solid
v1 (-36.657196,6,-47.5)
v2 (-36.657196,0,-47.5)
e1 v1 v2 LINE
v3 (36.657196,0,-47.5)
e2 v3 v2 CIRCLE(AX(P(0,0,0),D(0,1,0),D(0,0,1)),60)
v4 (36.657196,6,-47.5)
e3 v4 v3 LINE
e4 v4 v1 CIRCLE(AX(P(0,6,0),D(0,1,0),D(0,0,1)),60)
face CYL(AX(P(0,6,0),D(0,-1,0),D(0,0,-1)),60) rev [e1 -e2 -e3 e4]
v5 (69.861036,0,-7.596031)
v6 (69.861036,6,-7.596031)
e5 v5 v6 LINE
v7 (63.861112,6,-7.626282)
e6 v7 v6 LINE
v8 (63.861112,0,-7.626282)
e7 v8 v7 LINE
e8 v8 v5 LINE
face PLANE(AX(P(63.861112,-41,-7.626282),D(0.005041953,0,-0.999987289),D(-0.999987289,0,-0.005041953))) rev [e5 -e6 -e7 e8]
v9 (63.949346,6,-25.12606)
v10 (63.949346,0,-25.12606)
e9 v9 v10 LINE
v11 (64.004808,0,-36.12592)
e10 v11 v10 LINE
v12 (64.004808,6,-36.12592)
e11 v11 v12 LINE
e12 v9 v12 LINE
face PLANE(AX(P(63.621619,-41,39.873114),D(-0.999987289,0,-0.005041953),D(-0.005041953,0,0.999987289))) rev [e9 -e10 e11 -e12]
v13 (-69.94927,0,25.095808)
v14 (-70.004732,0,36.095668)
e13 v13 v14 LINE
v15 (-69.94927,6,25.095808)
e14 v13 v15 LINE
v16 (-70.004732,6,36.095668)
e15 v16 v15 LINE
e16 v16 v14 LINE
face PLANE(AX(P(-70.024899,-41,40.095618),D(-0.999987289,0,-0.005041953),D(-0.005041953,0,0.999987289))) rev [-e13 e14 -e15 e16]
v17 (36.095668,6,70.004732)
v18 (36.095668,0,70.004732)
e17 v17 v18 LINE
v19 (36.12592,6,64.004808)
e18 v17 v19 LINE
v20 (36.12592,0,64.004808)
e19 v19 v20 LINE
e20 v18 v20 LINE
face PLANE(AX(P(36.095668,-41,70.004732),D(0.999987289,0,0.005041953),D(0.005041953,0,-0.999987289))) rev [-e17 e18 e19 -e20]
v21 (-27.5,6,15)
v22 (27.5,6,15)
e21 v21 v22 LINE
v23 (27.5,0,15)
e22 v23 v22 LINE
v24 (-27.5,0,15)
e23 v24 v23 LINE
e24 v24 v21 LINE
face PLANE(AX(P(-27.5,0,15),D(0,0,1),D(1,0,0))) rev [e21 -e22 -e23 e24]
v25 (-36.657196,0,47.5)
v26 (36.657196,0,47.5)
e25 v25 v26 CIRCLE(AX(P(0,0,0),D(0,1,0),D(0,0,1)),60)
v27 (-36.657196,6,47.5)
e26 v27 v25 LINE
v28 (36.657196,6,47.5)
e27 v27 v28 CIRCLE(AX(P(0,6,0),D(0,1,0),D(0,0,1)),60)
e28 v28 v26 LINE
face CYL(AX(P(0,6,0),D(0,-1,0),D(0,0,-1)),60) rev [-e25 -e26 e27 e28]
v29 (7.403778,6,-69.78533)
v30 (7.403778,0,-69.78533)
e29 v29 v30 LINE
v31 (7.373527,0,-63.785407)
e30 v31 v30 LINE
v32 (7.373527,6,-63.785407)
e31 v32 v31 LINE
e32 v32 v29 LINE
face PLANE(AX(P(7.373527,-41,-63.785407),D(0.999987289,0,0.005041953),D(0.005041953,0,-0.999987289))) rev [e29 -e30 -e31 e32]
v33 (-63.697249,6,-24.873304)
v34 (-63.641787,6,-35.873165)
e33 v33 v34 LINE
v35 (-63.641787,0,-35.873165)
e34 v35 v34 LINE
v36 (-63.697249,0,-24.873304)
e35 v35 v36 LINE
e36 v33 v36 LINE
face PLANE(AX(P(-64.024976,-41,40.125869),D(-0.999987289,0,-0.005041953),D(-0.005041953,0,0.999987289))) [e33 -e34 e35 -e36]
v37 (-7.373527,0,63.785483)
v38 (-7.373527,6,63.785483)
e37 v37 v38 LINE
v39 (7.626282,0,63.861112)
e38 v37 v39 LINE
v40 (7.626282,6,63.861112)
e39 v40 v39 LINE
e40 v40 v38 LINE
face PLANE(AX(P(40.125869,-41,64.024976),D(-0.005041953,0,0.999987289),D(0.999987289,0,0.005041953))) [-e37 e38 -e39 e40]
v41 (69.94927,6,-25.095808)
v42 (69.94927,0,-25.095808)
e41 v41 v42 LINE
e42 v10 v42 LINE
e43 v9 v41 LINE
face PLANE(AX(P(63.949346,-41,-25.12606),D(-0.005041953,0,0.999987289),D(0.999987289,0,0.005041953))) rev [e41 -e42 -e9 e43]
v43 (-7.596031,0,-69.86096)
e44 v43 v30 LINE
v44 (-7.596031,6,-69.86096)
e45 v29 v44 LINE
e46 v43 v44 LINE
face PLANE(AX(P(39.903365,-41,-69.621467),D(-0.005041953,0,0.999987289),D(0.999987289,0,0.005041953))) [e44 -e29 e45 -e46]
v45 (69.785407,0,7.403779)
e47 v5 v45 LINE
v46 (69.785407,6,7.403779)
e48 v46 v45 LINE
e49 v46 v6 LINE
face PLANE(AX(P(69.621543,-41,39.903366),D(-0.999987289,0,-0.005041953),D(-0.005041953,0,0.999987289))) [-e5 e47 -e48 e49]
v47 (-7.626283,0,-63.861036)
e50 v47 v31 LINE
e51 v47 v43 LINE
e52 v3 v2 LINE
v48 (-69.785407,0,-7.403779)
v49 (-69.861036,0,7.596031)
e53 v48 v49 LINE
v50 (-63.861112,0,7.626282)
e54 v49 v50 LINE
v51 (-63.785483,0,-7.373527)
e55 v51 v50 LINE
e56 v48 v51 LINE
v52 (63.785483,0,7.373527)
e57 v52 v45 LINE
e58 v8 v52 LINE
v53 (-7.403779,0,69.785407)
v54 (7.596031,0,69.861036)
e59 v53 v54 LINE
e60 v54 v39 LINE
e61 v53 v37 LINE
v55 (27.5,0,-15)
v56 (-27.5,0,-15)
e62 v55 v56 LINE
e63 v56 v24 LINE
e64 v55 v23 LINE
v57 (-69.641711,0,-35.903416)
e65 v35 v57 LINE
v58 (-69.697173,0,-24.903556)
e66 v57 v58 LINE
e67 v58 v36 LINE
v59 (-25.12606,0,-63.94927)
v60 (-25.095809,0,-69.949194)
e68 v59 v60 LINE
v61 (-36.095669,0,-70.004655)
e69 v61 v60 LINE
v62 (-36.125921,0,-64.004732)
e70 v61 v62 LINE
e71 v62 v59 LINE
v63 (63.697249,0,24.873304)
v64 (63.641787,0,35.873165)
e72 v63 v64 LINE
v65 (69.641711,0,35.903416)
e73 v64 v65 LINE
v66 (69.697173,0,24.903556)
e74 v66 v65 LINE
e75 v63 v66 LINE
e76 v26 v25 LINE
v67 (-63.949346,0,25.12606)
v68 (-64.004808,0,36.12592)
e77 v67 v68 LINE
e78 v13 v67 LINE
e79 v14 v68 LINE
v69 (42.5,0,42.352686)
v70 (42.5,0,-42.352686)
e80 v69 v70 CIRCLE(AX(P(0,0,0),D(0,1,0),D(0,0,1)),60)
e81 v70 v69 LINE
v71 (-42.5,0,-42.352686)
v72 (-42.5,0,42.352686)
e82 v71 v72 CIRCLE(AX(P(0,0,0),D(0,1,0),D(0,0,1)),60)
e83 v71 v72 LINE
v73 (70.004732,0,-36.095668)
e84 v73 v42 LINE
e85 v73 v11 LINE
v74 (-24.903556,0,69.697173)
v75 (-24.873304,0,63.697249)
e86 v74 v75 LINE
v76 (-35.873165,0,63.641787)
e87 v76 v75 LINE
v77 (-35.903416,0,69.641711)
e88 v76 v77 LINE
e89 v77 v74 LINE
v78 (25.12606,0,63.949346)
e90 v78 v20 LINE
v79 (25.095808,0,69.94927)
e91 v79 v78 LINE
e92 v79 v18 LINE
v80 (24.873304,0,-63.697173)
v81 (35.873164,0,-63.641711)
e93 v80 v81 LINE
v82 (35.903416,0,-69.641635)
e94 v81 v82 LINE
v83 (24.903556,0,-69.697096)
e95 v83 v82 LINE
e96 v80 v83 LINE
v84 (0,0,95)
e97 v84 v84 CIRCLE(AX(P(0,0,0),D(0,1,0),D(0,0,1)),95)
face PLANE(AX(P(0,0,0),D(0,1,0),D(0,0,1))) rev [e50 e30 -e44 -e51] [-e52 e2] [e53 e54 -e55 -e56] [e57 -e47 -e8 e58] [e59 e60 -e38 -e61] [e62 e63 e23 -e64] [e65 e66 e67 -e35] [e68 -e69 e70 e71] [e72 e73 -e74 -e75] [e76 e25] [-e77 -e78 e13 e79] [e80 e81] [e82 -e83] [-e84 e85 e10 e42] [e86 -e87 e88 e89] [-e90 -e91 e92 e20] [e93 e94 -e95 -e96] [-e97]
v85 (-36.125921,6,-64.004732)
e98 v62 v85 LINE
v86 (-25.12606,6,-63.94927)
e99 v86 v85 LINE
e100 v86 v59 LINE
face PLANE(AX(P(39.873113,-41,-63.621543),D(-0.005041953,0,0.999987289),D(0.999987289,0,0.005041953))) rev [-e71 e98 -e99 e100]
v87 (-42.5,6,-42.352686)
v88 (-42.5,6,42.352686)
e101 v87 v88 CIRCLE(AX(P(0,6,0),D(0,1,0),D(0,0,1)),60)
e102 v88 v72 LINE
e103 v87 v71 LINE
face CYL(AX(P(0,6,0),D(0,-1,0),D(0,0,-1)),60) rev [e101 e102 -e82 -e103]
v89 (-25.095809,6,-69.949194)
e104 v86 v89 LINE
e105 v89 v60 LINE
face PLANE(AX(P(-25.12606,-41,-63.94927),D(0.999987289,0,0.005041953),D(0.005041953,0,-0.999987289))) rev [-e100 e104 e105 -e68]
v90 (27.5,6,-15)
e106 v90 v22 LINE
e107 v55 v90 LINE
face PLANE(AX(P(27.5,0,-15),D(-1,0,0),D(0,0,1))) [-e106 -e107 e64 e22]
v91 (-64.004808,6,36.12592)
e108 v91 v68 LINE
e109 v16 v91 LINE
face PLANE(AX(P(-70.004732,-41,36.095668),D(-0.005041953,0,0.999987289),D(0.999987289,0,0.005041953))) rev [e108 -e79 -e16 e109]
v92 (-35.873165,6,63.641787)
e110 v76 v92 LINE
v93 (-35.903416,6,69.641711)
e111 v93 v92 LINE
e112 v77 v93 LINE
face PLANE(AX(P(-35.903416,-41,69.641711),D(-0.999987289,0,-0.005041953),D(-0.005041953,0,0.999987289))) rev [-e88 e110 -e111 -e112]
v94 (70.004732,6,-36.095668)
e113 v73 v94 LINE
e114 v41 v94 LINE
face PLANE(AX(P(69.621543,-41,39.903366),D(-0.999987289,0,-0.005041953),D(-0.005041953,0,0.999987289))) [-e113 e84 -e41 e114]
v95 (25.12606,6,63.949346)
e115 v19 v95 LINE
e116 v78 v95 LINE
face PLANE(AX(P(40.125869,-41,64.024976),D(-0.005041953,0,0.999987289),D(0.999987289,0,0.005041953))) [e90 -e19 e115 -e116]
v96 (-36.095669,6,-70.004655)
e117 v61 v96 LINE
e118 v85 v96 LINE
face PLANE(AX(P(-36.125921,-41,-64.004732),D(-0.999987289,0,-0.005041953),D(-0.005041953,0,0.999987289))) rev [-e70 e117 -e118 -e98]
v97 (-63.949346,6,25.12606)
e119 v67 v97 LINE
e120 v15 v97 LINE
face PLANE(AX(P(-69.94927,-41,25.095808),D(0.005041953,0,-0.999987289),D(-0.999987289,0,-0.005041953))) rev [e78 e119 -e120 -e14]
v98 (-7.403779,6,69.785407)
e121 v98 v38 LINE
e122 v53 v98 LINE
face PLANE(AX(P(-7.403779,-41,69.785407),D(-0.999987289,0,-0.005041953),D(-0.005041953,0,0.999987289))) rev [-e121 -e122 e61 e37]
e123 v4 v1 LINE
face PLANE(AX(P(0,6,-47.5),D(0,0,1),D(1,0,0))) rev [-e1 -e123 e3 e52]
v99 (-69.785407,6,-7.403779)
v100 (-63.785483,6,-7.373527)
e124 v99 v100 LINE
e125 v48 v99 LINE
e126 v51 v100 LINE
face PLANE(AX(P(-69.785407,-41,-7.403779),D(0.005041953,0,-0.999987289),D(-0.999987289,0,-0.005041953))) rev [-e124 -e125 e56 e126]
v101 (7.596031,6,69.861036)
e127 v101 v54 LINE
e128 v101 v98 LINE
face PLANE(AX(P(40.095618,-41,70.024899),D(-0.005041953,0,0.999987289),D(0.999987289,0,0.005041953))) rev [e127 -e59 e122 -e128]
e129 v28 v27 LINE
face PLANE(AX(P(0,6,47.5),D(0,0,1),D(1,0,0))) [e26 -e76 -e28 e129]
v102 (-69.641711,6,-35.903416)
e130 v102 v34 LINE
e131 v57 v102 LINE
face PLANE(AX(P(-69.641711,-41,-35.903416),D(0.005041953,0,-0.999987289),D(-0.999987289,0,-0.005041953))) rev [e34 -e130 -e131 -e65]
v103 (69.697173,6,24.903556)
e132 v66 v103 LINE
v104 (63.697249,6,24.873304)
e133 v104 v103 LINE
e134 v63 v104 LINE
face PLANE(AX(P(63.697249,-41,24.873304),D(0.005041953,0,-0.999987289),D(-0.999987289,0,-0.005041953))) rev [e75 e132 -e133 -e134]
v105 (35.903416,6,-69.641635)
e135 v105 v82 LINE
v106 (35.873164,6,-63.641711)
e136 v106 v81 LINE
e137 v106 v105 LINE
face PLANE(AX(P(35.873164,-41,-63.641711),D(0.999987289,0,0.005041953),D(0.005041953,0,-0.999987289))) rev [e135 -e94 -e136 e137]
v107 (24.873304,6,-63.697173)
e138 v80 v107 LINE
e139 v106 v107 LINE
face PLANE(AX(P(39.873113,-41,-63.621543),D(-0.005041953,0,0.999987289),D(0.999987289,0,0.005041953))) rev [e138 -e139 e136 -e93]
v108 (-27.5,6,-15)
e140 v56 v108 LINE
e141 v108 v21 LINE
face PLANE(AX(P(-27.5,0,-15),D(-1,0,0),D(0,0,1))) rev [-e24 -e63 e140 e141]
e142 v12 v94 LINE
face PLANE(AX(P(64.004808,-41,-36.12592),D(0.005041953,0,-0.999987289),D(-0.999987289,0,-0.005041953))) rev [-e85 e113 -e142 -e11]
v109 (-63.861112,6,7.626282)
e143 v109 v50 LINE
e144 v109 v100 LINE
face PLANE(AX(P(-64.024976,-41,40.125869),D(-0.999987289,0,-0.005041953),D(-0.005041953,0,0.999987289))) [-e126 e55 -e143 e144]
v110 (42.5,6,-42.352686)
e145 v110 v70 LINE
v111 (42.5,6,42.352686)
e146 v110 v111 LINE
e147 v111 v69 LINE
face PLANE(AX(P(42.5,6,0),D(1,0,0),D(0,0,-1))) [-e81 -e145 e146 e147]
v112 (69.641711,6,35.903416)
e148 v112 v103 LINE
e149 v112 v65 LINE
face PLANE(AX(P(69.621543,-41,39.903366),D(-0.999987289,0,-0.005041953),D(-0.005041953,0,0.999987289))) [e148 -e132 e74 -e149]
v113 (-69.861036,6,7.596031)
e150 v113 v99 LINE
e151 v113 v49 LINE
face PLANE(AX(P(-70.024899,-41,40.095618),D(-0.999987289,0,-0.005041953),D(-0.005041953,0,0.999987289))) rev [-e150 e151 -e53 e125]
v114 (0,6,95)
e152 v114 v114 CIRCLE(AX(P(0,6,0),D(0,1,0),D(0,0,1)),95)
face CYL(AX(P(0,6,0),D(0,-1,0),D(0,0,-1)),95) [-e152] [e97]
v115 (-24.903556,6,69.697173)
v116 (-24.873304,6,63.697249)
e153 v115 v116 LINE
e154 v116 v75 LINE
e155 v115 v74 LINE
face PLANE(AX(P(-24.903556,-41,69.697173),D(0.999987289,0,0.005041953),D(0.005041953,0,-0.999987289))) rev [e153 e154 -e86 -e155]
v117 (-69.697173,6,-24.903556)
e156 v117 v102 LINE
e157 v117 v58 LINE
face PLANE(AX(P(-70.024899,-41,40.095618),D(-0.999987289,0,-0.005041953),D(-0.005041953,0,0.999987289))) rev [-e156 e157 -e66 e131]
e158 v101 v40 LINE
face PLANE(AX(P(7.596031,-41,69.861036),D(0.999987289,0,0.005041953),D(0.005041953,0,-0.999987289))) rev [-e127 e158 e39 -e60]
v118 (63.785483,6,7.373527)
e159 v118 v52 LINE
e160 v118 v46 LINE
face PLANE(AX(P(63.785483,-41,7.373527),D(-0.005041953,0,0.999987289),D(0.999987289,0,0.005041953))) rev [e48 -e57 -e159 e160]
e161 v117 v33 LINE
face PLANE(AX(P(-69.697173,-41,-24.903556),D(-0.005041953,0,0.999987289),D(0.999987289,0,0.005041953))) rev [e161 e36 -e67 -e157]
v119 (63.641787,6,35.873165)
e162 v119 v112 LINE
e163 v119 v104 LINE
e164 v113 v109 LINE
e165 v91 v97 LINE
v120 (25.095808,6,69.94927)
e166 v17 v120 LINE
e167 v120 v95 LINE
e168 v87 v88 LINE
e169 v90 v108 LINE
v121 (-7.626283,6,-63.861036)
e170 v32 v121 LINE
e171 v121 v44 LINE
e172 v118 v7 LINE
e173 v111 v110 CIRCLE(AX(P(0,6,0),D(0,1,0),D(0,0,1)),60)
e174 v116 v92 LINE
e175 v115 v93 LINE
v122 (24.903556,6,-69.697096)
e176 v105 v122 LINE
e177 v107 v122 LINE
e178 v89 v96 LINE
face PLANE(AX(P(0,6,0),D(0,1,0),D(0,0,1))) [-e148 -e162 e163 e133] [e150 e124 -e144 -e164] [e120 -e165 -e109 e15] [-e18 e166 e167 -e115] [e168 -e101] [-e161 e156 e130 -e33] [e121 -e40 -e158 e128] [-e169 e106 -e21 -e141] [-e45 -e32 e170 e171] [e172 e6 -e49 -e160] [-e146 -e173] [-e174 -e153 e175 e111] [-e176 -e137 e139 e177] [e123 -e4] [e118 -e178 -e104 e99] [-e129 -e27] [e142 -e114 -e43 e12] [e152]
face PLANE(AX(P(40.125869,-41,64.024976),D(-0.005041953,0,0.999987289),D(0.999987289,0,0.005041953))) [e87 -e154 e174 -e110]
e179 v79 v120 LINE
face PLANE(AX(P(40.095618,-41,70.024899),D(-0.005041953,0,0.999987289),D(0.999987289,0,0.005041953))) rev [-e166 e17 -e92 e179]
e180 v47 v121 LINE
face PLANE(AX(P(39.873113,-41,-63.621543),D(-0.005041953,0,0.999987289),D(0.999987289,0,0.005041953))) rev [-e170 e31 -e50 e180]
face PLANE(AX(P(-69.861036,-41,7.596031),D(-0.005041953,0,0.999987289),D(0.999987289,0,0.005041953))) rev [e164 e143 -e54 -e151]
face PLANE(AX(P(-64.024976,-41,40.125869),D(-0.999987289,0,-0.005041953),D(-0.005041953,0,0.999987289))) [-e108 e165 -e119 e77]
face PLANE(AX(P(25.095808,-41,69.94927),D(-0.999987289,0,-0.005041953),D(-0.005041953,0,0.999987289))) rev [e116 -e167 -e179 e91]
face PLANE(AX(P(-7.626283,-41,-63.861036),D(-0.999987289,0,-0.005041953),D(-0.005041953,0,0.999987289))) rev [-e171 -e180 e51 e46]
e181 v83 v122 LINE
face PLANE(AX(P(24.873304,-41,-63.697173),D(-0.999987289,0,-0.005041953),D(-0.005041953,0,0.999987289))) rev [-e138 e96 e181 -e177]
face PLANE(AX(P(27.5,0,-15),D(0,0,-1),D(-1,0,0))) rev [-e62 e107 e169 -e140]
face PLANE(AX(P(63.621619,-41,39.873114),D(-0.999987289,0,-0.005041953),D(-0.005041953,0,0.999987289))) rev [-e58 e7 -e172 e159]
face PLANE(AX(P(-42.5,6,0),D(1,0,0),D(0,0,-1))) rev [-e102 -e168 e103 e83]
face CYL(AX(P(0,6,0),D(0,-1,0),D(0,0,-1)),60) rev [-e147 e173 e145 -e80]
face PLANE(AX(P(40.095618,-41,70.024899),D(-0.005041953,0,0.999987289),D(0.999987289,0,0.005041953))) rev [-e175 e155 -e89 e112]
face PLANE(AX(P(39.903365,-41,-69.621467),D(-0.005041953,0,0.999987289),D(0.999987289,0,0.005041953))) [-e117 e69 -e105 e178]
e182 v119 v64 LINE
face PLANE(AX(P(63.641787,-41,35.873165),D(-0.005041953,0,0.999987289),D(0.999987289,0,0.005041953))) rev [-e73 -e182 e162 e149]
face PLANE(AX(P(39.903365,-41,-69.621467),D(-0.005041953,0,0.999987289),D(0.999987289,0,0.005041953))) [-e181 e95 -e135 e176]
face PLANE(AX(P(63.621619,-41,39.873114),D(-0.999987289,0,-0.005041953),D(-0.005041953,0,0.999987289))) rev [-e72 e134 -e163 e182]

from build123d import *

# Parameters (mm, degrees)
SKETCH1_R             = 95
BOSS_EXTRUDE1_DEPTH   = 6
SKETCH2_W             = 55
SKETCH2_H             = 30
CUT_EXTRUDE1_DEPTH    = 135.484199815
CAVITY1_START         = -69.821849164
CAVITY1_OUTLINE_W     = 15
CAVITY1_OUTLINE_H     = 6
CAVITY1_OUTLINE_W_2   = 11
CAVITY1_DEPTH         = 6
CAVITY1_START_2       = 63.821772898
CAVITY1_2_OUTLINE_W   = 11
CAVITY1_2_OUTLINE_H   = 6
CAVITY1_2_OUTLINE_W_2 = 15
CAVITY1_2_DEPTH       = 6
CAVITY1_START_3       = -7.051829773
CAVITY1_3_OUTLINE_W   = 6
CAVITY1_3_OUTLINE_H   = 6
CAVITY1_3_DEPTH       = 14.103659546
CAVITY1_START_4       = -35.551829773
CAVITY1_4_OUTLINE_W   = 6
CAVITY1_4_OUTLINE_H   = 6
CAVITY1_4_DEPTH       = 10.103659546
CAVITY1_START_5       = 25.448170227
CAVITY1_5_OUTLINE_W   = 6
CAVITY1_5_OUTLINE_H   = 6
CAVITY1_5_DEPTH       = 10.103659546
CAVITY1_START_6       = -36.448170227
CAVITY1_6_OUTLINE_W   = 6
CAVITY1_6_OUTLINE_H   = 6
CAVITY1_6_DEPTH       = 0.896340454
CAVITY1_START_7       = -25.448170227
CAVITY1_7_OUTLINE_W   = 6
CAVITY1_7_OUTLINE_H   = 6
CAVITY1_7_DEPTH       = 0.896340454
CAVITY1_START_8       = -7.948170227
CAVITY1_8_OUTLINE_W   = 6
CAVITY1_8_OUTLINE_H   = 6
CAVITY1_8_DEPTH       = 0.896340454
CAVITY1_START_9       = 7.051829773
CAVITY1_9_OUTLINE_W   = 6
CAVITY1_9_OUTLINE_H   = 6
CAVITY1_9_DEPTH       = 0.896340454
CAVITY1_START_10      = 24.551829773
CAVITY1_10_OUTLINE_W  = 6
CAVITY1_10_OUTLINE_H  = 6
CAVITY1_10_DEPTH      = 0.896340454
CAVITY1_START_11      = 35.551829773
CAVITY1_11_OUTLINE_W  = 6
CAVITY1_11_OUTLINE_H  = 6
CAVITY1_11_DEPTH      = 0.896340454


# Read off the part's stored shape, not the designer's step: Cavity1
with BuildPart() as part:
    # Sketch1 → Boss-Extrude1 (new body)
    with BuildSketch(Plane(origin=(0, 0, 0), x_dir=(1, 0, 0), z_dir=(0, 1, 0))):
        with Locations(Location((0, 0, 0), (0, 0, 270))):
            Circle(SKETCH1_R)
        with BuildLine():
            Line((-36.657195747, -47.5), (36.657195747, -47.5))
            ThreePointArc((36.657195747, -47.5), (0, -60), (-36.657195747, -47.5))
        make_face(mode=Mode.SUBTRACT)
        with BuildLine():
            Line((-42.5, 42.352685865), (-42.5, -42.352685865))
            ThreePointArc((-42.5, -42.352685865), (-60, 0), (-42.5, 42.352685865))
        make_face(mode=Mode.SUBTRACT)
        with BuildLine():
            Line((36.657195747, 47.5), (-36.657195747, 47.5))
            ThreePointArc((-36.657195747, 47.5), (0, 60), (36.657195747, 47.5))
        make_face(mode=Mode.SUBTRACT)
        with BuildLine():
            Line((42.5, -42.352685865), (42.5, 42.352685865))
            ThreePointArc((42.5, 42.352685865), (60, 0), (42.5, -42.352685865))
        make_face(mode=Mode.SUBTRACT)
    extrude(amount=BOSS_EXTRUDE1_DEPTH)

    # Sketch2 → Cut-Extrude1 (cut, through all)
    with BuildSketch(Plane(origin=(0, 6, 0), x_dir=(1, 0, 0), z_dir=(0, 1, 0))):
        Rectangle(SKETCH2_W, SKETCH2_H)
    extrude(amount=-CUT_EXTRUDE1_DEPTH, mode=Mode.SUBTRACT)

    # Cavity1 outline → Cavity1 (cut)
    with BuildSketch(Plane(origin=(0, 0, 0), x_dir=(0.9999872892756082, 0, 0.005041952719030872), z_dir=(0.005041952719030872, 0, -0.9999872892756083)).offset(CAVITY1_START)):
        with Locations((0.448170227, -3)):
            Rectangle(CAVITY1_OUTLINE_W, CAVITY1_OUTLINE_H)
        with Locations((30.948170227, -3)):
            Rectangle(CAVITY1_OUTLINE_W_2, CAVITY1_OUTLINE_H)
        with Locations((-30.051829773, -3)):
            Rectangle(CAVITY1_OUTLINE_W_2, CAVITY1_OUTLINE_H)
    extrude(amount=CAVITY1_DEPTH, mode=Mode.SUBTRACT)

    # Cavity1 2 outline → Cavity1 2 (cut)
    with BuildSketch(Plane(origin=(0, 0, 0), x_dir=(0.9999872892756082, 0, 0.005041952719030872), z_dir=(0.005041952719030872, 0, -0.9999872892756083)).offset(CAVITY1_START_2)):
        with Locations((30.051829773, -3)):
            Rectangle(CAVITY1_2_OUTLINE_W, CAVITY1_2_OUTLINE_H)
        with Locations((-0.448170227, -3)):
            Rectangle(CAVITY1_2_OUTLINE_W_2, CAVITY1_2_OUTLINE_H)
        with Locations((-30.948170227, -3)):
            Rectangle(CAVITY1_2_OUTLINE_W, CAVITY1_2_OUTLINE_H)
    extrude(amount=CAVITY1_2_DEPTH, mode=Mode.SUBTRACT)

    # Cavity1 3 outline → Cavity1 3 (cut)
    with BuildSketch(Plane(origin=(0, 0, 0), x_dir=(0.9999872892756082, 0, 0.005041952719030872), z_dir=(0.005041952719030872, 0, -0.9999872892756083)).offset(CAVITY1_START_3)):
        with Locations((66.821849164, -3)):
            Rectangle(CAVITY1_3_OUTLINE_W, CAVITY1_3_OUTLINE_H)
        with Locations((-66.821849164, -3)):
            Rectangle(CAVITY1_3_OUTLINE_W, CAVITY1_3_OUTLINE_H)
    extrude(amount=CAVITY1_3_DEPTH, mode=Mode.SUBTRACT)

    # Cavity1 4 outline → Cavity1 4 (cut)
    with BuildSketch(Plane(origin=(0, 0, 0), x_dir=(0.9999872892756082, 0, 0.005041952719030872), z_dir=(0.005041952719030872, 0, -0.9999872892756083)).offset(CAVITY1_START_4)):
        with Locations((66.821849164, -3)):
            Rectangle(CAVITY1_4_OUTLINE_W, CAVITY1_4_OUTLINE_H)
        with Locations((-66.821849164, -3)):
            Rectangle(CAVITY1_4_OUTLINE_W, CAVITY1_4_OUTLINE_H)
    extrude(amount=CAVITY1_4_DEPTH, mode=Mode.SUBTRACT)

    # Cavity1 5 outline → Cavity1 5 (cut)
    with BuildSketch(Plane(origin=(0, 0, 0), x_dir=(0.9999872892756082, 0, 0.005041952719030872), z_dir=(0.005041952719030872, 0, -0.9999872892756083)).offset(CAVITY1_START_5)):
        with Locations((66.821849164, -3)):
            Rectangle(CAVITY1_5_OUTLINE_W, CAVITY1_5_OUTLINE_H)
        with Locations((-66.821849164, -3)):
            Rectangle(CAVITY1_5_OUTLINE_W, CAVITY1_5_OUTLINE_H)
    extrude(amount=CAVITY1_5_DEPTH, mode=Mode.SUBTRACT)

    # Cavity1 6 outline → Cavity1 6 (cut)
    with BuildSketch(Plane(origin=(0, 0, 0), x_dir=(0.9999872892756082, 0, 0.005041952719030872), z_dir=(0.005041952719030872, 0, -0.9999872892756083)).offset(CAVITY1_START_6)):
        with Locations((-66.821849164, -3)):
            Rectangle(CAVITY1_6_OUTLINE_W, CAVITY1_6_OUTLINE_H)
    extrude(amount=CAVITY1_6_DEPTH, mode=Mode.SUBTRACT)

    # Cavity1 7 outline → Cavity1 7 (cut)
    with BuildSketch(Plane(origin=(0, 0, 0), x_dir=(0.9999872892756082, 0, 0.005041952719030872), z_dir=(0.005041952719030872, 0, -0.9999872892756083)).offset(CAVITY1_START_7)):
        with Locations((66.821849164, -3)):
            Rectangle(CAVITY1_7_OUTLINE_W, CAVITY1_7_OUTLINE_H)
    extrude(amount=CAVITY1_7_DEPTH, mode=Mode.SUBTRACT)

    # Cavity1 8 outline → Cavity1 8 (cut)
    with BuildSketch(Plane(origin=(0, 0, 0), x_dir=(0.9999872892756082, 0, 0.005041952719030872), z_dir=(0.005041952719030872, 0, -0.9999872892756083)).offset(CAVITY1_START_8)):
        with Locations((-66.821849164, -3)):
            Rectangle(CAVITY1_8_OUTLINE_W, CAVITY1_8_OUTLINE_H)
    extrude(amount=CAVITY1_8_DEPTH, mode=Mode.SUBTRACT)

    # Cavity1 9 outline → Cavity1 9 (cut)
    with BuildSketch(Plane(origin=(0, 0, 0), x_dir=(0.9999872892756082, 0, 0.005041952719030872), z_dir=(0.005041952719030872, 0, -0.9999872892756083)).offset(CAVITY1_START_9)):
        with Locations((66.821849164, -3)):
            Rectangle(CAVITY1_9_OUTLINE_W, CAVITY1_9_OUTLINE_H)
    extrude(amount=CAVITY1_9_DEPTH, mode=Mode.SUBTRACT)

    # Cavity1 10 outline → Cavity1 10 (cut)
    with BuildSketch(Plane(origin=(0, 0, 0), x_dir=(0.9999872892756082, 0, 0.005041952719030872), z_dir=(0.005041952719030872, 0, -0.9999872892756083)).offset(CAVITY1_START_10)):
        with Locations((-66.821849164, -3)):
            Rectangle(CAVITY1_10_OUTLINE_W, CAVITY1_10_OUTLINE_H)
    extrude(amount=CAVITY1_10_DEPTH, mode=Mode.SUBTRACT)

    # Cavity1 11 outline → Cavity1 11 (cut)
    with BuildSketch(Plane(origin=(0, 0, 0), x_dir=(0.9999872892756082, 0, 0.005041952719030872), z_dir=(0.005041952719030872, 0, -0.9999872892756083)).offset(CAVITY1_START_11)):
        with Locations((66.821849164, -3)):
            Rectangle(CAVITY1_11_OUTLINE_W, CAVITY1_11_OUTLINE_H)
    extrude(amount=CAVITY1_11_DEPTH, mode=Mode.SUBTRACT)


solid = part.part
